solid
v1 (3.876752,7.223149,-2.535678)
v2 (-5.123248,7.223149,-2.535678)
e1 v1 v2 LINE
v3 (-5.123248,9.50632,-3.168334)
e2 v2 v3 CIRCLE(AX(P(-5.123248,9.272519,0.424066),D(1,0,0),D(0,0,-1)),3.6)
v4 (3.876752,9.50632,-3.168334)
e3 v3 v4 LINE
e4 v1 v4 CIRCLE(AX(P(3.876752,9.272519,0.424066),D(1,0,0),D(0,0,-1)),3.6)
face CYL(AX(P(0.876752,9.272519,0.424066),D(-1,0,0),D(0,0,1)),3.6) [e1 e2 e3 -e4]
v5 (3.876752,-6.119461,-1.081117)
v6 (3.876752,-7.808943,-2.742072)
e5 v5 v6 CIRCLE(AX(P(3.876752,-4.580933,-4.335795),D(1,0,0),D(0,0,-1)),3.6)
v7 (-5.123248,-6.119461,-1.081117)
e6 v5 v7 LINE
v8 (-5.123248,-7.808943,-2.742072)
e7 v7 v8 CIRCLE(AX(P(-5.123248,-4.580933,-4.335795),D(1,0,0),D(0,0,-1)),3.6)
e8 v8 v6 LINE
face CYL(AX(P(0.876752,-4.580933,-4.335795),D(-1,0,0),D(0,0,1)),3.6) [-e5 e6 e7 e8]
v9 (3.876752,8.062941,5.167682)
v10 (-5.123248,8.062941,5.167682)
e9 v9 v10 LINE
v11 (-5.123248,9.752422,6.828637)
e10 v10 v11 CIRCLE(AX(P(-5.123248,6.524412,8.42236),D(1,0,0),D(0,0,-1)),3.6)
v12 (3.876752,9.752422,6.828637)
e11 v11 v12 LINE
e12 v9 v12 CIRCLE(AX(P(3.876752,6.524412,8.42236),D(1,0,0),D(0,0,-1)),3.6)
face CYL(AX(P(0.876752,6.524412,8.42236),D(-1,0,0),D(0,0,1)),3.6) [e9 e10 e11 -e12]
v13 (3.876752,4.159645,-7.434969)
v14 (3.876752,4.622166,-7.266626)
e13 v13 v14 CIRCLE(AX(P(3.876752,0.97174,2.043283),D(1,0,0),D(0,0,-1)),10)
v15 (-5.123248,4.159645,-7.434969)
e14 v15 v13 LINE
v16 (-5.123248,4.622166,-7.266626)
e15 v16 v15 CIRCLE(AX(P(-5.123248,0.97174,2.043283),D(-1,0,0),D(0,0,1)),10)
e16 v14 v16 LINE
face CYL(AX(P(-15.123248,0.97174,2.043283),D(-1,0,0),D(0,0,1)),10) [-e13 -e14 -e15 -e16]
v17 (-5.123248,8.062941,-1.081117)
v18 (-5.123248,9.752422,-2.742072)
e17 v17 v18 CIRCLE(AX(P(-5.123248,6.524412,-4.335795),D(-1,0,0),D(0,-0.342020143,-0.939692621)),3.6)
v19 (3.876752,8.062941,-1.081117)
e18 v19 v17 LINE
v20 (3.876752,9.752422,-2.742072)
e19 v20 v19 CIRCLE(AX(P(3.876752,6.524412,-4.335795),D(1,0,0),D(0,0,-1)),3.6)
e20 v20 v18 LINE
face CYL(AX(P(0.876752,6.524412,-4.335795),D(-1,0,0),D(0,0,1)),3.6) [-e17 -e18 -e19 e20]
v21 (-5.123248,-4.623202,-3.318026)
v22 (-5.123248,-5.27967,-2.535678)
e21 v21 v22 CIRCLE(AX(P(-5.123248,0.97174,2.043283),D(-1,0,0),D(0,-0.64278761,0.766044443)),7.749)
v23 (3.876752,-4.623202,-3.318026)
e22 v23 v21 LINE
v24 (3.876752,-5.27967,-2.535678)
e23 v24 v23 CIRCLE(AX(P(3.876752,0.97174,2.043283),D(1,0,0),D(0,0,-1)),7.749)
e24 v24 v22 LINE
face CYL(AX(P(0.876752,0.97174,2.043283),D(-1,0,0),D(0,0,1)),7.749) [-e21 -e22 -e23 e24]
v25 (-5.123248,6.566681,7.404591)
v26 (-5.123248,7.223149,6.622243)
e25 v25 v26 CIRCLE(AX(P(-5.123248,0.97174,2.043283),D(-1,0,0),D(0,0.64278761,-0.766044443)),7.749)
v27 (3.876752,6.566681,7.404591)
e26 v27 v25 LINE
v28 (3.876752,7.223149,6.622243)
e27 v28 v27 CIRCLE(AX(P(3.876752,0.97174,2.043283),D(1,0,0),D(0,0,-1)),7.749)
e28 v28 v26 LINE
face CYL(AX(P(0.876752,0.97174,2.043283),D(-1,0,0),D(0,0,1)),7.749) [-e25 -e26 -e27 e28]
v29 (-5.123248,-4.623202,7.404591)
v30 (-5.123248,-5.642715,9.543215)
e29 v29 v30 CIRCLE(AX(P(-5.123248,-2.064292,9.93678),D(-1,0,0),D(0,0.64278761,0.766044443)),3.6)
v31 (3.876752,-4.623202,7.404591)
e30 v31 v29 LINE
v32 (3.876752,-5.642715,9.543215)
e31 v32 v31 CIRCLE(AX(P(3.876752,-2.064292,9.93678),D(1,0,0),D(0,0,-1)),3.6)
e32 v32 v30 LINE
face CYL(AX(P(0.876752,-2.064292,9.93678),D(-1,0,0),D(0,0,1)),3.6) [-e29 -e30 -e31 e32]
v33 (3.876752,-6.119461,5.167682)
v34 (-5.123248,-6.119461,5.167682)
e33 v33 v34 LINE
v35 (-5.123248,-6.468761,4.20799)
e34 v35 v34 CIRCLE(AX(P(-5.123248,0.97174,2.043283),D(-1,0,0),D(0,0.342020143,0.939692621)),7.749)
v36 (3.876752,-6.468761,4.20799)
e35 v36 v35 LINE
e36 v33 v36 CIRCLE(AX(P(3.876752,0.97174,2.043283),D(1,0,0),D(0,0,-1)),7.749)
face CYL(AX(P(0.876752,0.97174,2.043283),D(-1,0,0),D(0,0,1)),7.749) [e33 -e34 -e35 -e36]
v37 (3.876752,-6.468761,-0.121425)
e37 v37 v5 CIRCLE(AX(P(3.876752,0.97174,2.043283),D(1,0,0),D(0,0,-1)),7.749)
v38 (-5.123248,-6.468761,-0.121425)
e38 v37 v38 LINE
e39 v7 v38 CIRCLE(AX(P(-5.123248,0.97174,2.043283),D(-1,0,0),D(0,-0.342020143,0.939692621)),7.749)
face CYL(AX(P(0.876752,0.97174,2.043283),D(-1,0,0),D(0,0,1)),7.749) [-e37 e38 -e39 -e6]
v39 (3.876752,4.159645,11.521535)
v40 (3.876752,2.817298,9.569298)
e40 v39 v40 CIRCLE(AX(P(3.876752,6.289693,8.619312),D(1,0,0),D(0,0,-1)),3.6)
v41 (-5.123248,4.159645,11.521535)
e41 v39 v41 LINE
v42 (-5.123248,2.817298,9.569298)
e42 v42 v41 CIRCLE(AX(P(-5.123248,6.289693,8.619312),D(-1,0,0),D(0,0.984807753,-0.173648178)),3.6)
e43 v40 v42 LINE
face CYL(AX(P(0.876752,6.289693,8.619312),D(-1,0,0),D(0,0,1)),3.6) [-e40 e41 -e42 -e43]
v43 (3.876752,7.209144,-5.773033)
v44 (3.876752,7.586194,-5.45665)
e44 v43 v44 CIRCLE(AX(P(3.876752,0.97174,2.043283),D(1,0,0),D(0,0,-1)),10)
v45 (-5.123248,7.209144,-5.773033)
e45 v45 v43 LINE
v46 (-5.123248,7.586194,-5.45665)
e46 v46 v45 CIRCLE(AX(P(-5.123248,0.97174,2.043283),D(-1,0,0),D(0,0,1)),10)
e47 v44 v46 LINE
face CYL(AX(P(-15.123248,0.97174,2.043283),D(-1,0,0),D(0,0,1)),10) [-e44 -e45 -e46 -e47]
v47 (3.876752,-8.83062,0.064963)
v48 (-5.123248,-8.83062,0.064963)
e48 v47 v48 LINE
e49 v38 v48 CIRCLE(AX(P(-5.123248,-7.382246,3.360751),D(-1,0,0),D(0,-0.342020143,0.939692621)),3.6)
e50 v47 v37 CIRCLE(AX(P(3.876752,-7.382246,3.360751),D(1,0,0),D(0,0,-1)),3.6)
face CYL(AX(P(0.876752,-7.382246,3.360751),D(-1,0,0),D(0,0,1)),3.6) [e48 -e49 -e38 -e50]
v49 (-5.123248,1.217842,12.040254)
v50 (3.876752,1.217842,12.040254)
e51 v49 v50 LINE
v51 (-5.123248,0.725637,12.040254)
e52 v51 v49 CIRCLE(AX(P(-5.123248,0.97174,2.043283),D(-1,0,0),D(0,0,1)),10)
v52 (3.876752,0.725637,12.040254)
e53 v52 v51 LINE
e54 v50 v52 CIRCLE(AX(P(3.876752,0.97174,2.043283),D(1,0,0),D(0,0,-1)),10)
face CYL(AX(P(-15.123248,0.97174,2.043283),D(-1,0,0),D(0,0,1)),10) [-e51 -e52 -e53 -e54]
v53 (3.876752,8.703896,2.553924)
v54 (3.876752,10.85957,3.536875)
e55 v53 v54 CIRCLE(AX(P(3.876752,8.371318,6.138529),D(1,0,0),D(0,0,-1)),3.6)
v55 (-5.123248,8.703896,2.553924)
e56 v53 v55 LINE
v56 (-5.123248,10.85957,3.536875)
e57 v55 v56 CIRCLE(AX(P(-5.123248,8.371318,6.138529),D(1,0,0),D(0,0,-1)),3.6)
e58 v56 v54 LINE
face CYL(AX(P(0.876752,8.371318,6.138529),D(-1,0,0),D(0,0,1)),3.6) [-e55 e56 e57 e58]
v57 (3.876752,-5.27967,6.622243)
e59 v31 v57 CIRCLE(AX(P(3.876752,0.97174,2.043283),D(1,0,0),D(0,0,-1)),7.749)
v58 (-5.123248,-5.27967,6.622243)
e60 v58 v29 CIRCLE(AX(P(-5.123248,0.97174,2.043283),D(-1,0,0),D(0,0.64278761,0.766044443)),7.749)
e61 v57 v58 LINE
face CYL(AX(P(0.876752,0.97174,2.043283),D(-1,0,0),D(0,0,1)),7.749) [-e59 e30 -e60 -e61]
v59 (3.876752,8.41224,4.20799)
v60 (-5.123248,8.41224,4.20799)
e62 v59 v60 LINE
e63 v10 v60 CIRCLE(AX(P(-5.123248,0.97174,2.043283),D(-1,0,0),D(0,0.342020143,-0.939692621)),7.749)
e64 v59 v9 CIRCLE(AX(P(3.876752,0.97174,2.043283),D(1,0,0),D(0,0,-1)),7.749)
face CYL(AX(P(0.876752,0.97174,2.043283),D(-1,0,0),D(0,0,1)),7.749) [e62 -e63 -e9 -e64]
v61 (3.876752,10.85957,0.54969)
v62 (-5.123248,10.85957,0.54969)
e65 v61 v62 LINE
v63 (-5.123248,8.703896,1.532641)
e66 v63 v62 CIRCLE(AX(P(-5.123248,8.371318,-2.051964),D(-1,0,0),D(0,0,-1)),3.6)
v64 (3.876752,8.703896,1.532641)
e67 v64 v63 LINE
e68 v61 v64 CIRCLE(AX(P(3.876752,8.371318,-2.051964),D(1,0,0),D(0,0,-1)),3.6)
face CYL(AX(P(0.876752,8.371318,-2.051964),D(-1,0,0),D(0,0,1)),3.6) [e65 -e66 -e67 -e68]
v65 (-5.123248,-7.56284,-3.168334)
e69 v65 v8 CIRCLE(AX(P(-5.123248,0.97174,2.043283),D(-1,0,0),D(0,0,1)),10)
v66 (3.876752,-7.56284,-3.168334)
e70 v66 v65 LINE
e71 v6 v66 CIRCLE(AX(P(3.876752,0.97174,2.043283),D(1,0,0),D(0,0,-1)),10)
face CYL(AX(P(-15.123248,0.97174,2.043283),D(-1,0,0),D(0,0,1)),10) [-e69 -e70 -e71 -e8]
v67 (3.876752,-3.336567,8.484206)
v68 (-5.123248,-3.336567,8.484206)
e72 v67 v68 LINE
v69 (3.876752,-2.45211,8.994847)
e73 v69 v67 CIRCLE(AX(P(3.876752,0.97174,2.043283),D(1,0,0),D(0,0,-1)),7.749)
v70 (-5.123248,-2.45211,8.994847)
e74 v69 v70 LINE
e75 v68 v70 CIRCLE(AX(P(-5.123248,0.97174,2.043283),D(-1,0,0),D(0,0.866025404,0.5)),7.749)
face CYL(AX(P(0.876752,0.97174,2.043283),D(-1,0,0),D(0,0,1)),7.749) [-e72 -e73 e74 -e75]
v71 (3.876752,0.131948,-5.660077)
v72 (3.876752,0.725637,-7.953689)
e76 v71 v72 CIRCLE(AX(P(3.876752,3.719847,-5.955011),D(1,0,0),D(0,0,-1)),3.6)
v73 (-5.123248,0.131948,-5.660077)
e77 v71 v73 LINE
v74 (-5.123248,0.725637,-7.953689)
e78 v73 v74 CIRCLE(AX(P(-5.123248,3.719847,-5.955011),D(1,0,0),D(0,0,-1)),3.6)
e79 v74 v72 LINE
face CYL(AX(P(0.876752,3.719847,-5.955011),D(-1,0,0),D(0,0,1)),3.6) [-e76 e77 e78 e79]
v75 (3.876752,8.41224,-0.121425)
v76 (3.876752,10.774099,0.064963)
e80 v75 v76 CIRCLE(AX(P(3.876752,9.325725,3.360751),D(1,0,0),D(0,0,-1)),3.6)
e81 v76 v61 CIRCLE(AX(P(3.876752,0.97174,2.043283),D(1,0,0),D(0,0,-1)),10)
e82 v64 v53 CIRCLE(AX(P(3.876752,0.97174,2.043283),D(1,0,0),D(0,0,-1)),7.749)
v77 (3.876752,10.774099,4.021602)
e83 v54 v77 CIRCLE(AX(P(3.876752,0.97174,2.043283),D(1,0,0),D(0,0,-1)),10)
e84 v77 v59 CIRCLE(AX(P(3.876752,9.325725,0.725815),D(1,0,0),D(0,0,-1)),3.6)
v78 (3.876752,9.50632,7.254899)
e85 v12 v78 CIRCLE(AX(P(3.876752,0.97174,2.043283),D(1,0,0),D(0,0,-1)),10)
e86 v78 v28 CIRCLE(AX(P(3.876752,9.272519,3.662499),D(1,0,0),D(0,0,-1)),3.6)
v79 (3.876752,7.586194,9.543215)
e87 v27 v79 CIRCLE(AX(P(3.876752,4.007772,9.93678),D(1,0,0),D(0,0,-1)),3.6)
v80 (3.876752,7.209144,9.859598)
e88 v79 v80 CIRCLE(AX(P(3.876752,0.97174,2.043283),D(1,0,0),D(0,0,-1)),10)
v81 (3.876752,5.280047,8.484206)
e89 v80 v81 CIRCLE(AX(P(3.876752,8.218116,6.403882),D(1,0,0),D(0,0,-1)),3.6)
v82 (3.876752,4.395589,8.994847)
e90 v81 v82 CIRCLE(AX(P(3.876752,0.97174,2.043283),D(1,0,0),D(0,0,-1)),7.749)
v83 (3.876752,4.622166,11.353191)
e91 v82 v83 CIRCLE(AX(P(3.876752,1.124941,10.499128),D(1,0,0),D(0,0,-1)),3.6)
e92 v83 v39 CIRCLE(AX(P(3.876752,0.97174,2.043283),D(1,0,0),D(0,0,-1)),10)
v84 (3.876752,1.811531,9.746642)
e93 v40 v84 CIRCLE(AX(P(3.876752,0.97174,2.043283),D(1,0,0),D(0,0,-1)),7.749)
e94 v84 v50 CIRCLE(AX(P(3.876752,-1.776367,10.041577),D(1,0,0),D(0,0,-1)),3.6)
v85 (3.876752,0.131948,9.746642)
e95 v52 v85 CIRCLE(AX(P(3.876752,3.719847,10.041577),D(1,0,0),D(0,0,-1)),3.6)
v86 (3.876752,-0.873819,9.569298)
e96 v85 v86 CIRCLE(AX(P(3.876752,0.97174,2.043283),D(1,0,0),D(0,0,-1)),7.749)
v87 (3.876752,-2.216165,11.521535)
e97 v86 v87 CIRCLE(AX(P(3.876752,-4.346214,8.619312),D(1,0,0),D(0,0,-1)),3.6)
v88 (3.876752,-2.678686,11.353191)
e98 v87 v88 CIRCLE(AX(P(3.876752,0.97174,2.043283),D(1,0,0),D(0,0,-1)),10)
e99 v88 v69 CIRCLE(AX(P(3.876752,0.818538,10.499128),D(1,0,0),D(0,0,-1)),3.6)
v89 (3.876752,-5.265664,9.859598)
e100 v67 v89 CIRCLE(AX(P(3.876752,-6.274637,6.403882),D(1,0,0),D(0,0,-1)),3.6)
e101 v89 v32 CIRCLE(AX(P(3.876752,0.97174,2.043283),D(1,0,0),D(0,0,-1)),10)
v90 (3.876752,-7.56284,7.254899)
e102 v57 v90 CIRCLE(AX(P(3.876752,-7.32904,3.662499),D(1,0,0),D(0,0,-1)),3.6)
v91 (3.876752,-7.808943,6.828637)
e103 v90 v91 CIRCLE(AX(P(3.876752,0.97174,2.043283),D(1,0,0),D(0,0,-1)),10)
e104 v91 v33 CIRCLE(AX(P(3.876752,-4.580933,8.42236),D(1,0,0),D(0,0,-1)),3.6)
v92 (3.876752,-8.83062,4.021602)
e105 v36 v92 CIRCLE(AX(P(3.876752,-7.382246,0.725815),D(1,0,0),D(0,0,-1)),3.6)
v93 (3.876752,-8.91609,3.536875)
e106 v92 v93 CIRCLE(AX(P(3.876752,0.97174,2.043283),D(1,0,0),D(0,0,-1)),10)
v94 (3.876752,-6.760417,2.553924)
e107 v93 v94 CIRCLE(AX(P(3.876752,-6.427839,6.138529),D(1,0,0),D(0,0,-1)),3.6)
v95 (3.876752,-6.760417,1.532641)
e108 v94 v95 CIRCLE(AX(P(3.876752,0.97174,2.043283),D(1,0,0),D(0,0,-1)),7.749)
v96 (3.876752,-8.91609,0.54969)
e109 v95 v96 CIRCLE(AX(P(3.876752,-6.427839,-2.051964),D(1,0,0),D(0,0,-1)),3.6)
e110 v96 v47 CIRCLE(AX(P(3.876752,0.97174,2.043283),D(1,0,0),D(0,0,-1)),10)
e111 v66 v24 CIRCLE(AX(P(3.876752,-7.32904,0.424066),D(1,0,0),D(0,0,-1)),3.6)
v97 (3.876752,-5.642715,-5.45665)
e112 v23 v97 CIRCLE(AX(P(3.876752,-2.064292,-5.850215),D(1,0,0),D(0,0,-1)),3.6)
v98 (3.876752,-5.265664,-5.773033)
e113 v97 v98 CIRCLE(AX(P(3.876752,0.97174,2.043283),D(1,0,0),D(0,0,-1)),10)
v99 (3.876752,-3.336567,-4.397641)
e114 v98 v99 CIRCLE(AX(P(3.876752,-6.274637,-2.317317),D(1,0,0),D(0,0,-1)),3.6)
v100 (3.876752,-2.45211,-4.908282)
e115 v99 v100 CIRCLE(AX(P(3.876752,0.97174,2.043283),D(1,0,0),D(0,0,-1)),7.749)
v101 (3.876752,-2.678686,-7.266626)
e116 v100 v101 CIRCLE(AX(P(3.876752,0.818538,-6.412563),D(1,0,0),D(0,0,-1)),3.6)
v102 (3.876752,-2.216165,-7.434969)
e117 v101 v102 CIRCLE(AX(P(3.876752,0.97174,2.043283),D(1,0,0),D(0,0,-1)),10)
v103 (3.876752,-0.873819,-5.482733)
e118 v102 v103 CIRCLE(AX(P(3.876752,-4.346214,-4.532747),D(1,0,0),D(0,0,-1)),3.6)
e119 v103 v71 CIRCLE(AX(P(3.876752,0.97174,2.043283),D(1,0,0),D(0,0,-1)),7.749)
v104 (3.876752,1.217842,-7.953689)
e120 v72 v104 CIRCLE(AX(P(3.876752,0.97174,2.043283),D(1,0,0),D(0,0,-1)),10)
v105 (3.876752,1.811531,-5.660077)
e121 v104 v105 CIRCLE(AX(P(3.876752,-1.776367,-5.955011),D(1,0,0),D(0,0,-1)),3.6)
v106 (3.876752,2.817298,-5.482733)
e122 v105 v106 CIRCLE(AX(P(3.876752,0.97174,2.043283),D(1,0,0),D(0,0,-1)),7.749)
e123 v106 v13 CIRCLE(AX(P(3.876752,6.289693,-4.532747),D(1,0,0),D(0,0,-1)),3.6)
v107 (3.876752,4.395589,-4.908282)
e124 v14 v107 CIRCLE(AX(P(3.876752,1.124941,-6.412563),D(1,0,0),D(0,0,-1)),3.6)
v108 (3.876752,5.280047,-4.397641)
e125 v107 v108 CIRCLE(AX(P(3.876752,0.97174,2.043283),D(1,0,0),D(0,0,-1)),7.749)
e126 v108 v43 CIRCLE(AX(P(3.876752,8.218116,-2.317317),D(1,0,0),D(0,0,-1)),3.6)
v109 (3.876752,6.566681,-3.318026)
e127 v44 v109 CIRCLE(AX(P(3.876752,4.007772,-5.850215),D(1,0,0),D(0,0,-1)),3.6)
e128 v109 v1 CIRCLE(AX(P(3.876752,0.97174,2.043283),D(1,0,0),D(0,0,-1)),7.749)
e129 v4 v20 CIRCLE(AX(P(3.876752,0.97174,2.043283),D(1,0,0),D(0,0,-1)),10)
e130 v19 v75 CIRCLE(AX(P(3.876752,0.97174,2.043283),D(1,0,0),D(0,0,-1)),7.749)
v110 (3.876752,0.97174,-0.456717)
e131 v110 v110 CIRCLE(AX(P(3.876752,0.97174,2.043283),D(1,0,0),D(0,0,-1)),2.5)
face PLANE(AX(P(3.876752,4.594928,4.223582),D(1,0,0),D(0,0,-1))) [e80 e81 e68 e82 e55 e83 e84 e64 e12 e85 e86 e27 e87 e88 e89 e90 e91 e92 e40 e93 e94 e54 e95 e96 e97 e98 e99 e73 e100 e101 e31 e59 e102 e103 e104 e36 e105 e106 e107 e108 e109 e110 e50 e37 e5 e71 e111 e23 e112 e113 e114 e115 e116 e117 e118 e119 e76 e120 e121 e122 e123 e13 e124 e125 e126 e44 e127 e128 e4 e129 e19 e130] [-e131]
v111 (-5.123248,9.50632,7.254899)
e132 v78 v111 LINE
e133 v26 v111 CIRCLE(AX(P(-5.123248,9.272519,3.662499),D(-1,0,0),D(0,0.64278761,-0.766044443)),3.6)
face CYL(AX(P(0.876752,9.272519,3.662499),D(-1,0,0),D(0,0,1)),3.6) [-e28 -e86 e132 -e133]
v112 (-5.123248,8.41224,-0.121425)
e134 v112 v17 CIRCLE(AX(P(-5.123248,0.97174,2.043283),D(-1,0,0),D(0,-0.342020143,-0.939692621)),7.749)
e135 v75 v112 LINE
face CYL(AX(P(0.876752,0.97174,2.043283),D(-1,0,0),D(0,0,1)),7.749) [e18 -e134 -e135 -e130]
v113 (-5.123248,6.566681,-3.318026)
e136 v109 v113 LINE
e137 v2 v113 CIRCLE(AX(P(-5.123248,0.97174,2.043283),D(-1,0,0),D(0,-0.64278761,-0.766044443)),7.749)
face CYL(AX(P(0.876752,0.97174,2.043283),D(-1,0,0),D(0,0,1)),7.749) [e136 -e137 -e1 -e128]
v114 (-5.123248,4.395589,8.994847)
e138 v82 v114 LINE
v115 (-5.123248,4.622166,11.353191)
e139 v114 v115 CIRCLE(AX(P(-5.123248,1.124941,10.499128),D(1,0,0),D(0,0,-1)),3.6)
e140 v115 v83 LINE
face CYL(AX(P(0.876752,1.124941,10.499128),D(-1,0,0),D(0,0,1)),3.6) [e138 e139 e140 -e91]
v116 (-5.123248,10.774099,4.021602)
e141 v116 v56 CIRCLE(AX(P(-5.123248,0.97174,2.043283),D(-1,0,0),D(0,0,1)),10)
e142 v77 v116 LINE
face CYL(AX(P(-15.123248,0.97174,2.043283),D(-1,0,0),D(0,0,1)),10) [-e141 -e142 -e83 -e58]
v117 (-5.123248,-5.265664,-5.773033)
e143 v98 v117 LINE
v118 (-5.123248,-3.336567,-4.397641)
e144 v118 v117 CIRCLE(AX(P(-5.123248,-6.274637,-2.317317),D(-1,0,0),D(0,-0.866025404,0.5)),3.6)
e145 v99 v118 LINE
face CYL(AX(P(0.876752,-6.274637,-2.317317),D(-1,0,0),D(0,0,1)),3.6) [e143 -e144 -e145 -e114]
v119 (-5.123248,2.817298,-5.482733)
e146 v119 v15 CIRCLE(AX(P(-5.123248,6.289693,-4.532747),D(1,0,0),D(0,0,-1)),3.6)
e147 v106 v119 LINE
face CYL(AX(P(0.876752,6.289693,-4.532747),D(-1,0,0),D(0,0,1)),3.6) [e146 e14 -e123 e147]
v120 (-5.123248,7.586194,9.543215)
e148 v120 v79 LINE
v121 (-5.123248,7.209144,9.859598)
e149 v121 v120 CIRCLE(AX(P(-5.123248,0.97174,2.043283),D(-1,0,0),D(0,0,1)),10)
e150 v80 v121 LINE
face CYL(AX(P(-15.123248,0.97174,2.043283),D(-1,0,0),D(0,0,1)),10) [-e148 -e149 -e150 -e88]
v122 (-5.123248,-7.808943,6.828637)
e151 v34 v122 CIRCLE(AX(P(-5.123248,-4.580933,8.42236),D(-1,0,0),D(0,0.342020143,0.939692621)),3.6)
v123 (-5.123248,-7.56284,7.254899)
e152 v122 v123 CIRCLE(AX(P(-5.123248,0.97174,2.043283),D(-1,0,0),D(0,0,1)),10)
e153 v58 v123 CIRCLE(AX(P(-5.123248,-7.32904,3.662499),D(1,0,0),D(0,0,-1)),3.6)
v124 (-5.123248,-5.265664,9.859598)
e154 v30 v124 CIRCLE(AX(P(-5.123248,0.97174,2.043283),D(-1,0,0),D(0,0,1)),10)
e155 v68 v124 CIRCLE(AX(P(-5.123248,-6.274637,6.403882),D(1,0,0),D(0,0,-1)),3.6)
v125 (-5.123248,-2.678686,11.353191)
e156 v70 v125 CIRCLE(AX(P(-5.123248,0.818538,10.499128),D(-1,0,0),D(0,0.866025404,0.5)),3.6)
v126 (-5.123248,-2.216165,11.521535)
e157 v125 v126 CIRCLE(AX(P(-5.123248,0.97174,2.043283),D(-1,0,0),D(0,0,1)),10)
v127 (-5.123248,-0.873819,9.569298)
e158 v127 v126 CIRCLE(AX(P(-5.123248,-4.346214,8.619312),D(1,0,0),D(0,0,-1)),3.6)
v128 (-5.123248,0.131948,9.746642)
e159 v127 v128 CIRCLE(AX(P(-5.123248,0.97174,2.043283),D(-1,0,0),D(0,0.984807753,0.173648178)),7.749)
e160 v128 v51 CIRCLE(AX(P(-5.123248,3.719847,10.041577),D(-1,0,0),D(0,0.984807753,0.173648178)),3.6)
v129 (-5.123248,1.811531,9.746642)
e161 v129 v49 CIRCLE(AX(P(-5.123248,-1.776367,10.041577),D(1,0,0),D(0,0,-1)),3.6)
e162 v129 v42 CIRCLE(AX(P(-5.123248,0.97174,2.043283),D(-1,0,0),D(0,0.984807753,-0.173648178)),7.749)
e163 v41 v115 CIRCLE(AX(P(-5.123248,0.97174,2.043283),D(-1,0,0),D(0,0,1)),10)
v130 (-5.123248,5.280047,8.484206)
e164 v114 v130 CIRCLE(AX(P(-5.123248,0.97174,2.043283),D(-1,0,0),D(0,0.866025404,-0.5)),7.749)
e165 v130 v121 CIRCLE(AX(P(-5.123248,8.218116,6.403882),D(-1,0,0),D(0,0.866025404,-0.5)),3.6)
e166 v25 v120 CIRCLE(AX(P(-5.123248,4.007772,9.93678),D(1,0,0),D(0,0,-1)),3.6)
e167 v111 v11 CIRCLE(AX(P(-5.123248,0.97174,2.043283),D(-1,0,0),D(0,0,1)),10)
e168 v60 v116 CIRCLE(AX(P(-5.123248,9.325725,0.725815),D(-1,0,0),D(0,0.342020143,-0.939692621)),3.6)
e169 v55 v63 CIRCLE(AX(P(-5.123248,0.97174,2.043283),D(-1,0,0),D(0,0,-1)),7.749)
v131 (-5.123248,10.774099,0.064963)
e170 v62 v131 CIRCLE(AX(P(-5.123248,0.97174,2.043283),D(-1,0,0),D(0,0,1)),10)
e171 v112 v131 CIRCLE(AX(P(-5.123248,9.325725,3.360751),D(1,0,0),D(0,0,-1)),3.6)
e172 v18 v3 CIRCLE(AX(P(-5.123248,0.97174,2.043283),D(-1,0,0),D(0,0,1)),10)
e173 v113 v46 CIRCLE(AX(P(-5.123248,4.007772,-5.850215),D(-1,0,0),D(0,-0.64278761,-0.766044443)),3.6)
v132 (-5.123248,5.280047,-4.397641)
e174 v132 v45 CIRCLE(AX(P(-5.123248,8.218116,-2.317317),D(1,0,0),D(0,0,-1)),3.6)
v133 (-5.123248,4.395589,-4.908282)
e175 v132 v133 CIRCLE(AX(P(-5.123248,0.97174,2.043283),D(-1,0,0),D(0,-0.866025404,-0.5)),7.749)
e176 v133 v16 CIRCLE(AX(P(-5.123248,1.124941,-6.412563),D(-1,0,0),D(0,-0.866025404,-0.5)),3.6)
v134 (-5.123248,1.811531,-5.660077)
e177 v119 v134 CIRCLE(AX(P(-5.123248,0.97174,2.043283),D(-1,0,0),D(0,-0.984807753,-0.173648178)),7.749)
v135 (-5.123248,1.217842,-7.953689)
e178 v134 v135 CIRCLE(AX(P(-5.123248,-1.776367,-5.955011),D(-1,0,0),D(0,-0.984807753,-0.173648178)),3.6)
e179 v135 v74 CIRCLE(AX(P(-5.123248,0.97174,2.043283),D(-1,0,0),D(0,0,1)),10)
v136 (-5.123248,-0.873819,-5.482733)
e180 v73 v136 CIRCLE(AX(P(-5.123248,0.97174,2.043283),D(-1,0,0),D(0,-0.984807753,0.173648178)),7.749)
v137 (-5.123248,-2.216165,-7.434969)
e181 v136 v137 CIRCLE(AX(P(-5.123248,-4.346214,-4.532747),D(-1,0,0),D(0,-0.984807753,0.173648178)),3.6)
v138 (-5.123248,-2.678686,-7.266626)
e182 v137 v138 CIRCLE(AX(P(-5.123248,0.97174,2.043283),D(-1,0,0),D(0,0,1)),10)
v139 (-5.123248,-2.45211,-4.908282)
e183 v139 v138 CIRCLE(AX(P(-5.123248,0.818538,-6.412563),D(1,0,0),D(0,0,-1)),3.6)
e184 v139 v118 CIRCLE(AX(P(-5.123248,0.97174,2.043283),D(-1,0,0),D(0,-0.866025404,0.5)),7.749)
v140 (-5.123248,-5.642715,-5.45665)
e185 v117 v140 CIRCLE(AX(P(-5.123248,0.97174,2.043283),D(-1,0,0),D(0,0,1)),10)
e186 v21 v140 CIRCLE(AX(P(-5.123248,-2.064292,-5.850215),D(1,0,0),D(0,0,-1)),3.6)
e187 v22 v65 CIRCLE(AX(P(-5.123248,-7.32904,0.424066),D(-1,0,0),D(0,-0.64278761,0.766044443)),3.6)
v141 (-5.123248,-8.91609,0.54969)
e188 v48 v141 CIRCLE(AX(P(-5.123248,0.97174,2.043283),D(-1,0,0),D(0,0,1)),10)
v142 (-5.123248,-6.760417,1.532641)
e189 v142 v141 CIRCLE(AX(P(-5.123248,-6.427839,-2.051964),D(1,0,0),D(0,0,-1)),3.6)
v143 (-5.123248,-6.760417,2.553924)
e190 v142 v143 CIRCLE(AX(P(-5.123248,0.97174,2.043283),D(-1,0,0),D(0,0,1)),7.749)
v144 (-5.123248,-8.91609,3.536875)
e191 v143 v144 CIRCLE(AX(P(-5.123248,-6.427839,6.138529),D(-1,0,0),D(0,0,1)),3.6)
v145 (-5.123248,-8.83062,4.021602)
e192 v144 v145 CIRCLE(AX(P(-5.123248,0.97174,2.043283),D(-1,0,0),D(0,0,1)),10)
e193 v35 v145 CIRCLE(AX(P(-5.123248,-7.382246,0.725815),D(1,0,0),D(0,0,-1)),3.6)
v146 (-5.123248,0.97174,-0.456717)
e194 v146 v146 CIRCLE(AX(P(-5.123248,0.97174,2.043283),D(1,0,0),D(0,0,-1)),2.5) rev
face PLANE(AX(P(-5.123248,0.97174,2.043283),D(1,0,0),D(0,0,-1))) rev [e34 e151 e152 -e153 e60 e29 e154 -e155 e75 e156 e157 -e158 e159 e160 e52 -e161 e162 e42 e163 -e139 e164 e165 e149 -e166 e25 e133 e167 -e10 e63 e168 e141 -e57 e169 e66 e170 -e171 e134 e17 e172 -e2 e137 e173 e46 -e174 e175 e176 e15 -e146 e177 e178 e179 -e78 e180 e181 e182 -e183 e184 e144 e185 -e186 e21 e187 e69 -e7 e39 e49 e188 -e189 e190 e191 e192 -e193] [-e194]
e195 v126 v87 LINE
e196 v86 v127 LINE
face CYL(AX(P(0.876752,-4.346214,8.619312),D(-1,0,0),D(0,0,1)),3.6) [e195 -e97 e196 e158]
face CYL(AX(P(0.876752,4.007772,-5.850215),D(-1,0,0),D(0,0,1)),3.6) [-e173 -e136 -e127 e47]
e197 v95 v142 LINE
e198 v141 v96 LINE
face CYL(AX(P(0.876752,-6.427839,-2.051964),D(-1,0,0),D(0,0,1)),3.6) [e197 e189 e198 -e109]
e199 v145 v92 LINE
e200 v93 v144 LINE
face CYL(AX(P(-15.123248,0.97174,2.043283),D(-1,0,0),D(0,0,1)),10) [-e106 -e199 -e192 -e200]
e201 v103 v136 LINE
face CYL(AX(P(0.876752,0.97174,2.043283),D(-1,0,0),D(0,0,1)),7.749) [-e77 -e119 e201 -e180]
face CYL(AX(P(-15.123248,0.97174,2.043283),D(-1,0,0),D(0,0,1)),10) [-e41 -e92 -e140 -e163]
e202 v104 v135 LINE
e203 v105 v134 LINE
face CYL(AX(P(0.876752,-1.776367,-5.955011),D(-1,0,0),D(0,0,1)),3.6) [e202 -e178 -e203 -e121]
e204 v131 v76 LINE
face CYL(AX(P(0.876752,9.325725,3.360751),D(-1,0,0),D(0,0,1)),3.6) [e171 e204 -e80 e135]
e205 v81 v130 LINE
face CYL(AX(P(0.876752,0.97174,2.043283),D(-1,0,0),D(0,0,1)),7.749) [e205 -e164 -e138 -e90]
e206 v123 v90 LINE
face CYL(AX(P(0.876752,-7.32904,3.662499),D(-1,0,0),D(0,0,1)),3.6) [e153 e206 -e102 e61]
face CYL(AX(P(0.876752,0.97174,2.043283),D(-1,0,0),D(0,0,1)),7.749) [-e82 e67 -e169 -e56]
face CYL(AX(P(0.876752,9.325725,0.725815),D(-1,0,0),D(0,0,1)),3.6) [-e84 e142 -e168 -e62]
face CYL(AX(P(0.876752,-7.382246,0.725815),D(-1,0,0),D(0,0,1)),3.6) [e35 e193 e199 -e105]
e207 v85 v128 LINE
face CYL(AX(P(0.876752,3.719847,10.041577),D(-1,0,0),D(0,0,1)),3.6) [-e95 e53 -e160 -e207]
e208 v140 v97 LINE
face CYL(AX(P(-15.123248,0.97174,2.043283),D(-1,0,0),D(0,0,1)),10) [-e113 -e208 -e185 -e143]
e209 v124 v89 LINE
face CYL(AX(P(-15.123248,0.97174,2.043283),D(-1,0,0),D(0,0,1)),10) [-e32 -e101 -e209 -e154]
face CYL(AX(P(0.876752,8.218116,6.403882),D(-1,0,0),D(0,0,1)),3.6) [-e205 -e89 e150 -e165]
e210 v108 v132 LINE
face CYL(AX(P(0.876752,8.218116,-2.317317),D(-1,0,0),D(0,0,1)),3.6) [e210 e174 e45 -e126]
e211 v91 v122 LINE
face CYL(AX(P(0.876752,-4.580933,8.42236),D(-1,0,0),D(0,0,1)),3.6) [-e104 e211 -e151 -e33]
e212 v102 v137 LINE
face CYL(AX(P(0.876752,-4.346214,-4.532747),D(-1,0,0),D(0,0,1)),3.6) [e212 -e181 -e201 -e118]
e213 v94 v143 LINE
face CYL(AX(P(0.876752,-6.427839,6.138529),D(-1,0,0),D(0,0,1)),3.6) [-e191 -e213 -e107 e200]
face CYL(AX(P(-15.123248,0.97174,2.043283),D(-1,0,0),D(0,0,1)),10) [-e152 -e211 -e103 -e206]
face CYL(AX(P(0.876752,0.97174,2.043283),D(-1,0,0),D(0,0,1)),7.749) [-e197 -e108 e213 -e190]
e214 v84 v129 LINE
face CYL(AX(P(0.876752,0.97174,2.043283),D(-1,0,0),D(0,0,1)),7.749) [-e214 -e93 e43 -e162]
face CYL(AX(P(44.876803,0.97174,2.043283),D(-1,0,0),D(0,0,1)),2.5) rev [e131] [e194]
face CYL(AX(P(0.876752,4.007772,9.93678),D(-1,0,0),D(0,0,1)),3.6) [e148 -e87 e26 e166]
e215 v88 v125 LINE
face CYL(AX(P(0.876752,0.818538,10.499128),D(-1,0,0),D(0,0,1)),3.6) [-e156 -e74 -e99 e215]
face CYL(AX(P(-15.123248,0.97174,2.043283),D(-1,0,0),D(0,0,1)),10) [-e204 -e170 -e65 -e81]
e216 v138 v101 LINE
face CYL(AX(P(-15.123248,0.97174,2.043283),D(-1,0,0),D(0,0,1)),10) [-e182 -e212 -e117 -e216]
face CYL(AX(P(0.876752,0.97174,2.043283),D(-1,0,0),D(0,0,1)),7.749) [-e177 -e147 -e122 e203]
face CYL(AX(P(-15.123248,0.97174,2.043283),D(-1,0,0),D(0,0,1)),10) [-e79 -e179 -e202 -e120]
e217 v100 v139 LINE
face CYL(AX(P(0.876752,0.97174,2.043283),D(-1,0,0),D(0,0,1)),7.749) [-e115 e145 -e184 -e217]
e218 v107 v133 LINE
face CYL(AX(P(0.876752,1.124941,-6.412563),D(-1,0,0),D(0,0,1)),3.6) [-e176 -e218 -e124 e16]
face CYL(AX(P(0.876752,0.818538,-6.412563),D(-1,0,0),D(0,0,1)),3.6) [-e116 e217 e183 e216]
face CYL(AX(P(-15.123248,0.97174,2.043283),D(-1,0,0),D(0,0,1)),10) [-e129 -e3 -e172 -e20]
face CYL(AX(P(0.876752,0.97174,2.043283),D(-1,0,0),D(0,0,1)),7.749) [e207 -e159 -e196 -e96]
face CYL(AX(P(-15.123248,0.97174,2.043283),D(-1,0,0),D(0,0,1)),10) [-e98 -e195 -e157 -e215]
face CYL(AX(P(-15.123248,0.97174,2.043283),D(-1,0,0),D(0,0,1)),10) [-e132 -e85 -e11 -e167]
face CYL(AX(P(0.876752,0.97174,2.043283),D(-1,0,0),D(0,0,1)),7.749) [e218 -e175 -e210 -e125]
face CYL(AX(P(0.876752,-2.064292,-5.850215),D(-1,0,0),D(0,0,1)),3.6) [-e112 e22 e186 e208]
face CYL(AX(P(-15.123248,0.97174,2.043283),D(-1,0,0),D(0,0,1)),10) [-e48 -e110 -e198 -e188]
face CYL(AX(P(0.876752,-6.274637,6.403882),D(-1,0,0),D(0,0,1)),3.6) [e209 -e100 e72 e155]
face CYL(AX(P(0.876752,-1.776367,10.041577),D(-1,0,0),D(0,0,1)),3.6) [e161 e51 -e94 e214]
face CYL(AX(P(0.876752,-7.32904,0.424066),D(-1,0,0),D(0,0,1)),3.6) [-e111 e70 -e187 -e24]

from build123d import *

# Parameters (mm, degrees)
SPUR_START             = -5.123248026
SPUR_GEAR_AM_OUTLINE_R = 2.5
SPUR_GEAR_AM_DEPTH     = 6
SKETCH9_R              = 2.5
BOSS_EXTRUDE1_DEPTH    = 3


# Read off the part's stored shape, not the designer's step: spur gear_am
with BuildPart() as part:
    # spur gear_am outline → spur gear_am (new body)
    with BuildSketch(Plane.YZ.offset(SPUR_START)):
        with BuildLine():
            ThreePointArc((7.586194163, 9.54321535), (7.39961576, 9.703727004), (7.209143639, 9.859598305))
            ThreePointArc((7.209143639, 9.859598305), (6.128209094, 9.33514268), (5.280046523, 8.484205876))
            ThreePointArc((5.280046523, 8.484205876), (4.846239663, 8.754113426), (4.395589438, 8.994847412))
            ThreePointArc((4.395589438, 8.994847412), (4.708441041, 10.154846148), (4.622165664, 11.353190736))
            ThreePointArc((4.622165664, 11.353190736), (4.391941096, 11.44020878), (4.159644725, 11.52153459))
            ThreePointArc((4.159644725, 11.52153459), (3.323272898, 10.659006121), (2.817298316, 9.569298401))
            ThreePointArc((2.817298316, 9.569298401), (2.317339392, 9.67455785), (1.811530828, 9.746642346))
            ThreePointArc((1.811530828, 9.746642346), (1.708772237, 10.943686148), (1.217841914, 12.040253798))
            ThreePointArc((1.217841914, 12.040253798), (0.971739663, 12.043282572), (0.725637412, 12.040253798))
            ThreePointArc((0.725637412, 12.040253798), (0.234707088, 10.943686148), (0.131948498, 9.746642346))
            ThreePointArc((0.131948498, 9.746642346), (-0.373860066, 9.67455785), (-0.87381899, 9.569298401))
            ThreePointArc((-0.87381899, 9.569298401), (-1.379793572, 10.659006121), (-2.216165399, 11.52153459))
            ThreePointArc((-2.216165399, 11.52153459), (-2.44846177, 11.44020878), (-2.678686338, 11.353190736))
            ThreePointArc((-2.678686338, 11.353190736), (-2.764961716, 10.154846148), (-2.452110112, 8.994847412))
            ThreePointArc((-2.452110112, 8.994847412), (-2.902760337, 8.754113426), (-3.336567197, 8.484205876))
            ThreePointArc((-3.336567197, 8.484205876), (-4.184729769, 9.33514268), (-5.265664313, 9.859598305))
            ThreePointArc((-5.265664313, 9.859598305), (-5.456136434, 9.703727004), (-5.642714837, 9.54321535))
            ThreePointArc((-5.642714837, 9.54321535), (-5.313929185, 8.387631866), (-4.623201908, 7.404591164))
            ThreePointArc((-4.623201908, 7.404591164), (-4.964338727, 7.02424376), (-5.279670013, 6.622242942))
            ThreePointArc((-5.279670013, 6.622242942), (-6.367719651, 7.131773293), (-7.562840254, 7.254898987))
            ThreePointArc((-7.562840254, 7.254898987), (-7.688514375, 7.043282572), (-7.808942505, 6.828637384))
            ThreePointArc((-7.808942505, 6.828637384), (-7.104752225, 5.855195427), (-6.119461178, 5.167681976))
            ThreePointArc((-6.119461178, 5.167681976), (-6.309938456, 4.693596663), (-6.468760561, 4.207989809))
            ThreePointArc((-6.468760561, 4.207989809), (-7.66546242, 4.314656828), (-8.830619899, 4.021601813))
            ThreePointArc((-8.830619899, 4.021601813), (-8.876337867, 3.779764349), (-8.916090314, 3.536875003))
            ThreePointArc((-8.916090314, 3.536875003), (-7.921431147, 2.86298604), (-6.760416972, 2.553924109))
            ThreePointArc((-6.760416972, 2.553924109), (-6.777260337, 2.043282572), (-6.760416972, 1.532641036))
            ThreePointArc((-6.760416972, 1.532641036), (-7.921431147, 1.223579105), (-8.916090314, 0.549690142))
            ThreePointArc((-8.916090314, 0.549690142), (-8.876337867, 0.306800796), (-8.830619899, 0.064963332))
            ThreePointArc((-8.830619899, 0.064963332), (-7.66546242, -0.228091683), (-6.468760561, -0.121424665))
            ThreePointArc((-6.468760561, -0.121424665), (-6.309938456, -0.607031518), (-6.119461178, -1.081116831))
            ThreePointArc((-6.119461178, -1.081116831), (-7.104752225, -1.768630282), (-7.808942505, -2.742072239))
            ThreePointArc((-7.808942505, -2.742072239), (-7.688514375, -2.956717428), (-7.562840254, -3.168333842))
            ThreePointArc((-7.562840254, -3.168333842), (-6.36771965, -3.045208149), (-5.279670013, -2.535677797))
            ThreePointArc((-5.279670013, -2.535677797), (-4.964338727, -2.937678615), (-4.623201908, -3.31802602))
            ThreePointArc((-4.623201908, -3.31802602), (-5.313929185, -4.301066721), (-5.642714837, -5.456650205))
            ThreePointArc((-5.642714837, -5.456650205), (-5.456136434, -5.617161859), (-5.265664313, -5.773033161))
            ThreePointArc((-5.265664313, -5.773033161), (-4.184729769, -5.248577535), (-3.336567197, -4.397640731))
            ThreePointArc((-3.336567197, -4.397640731), (-2.902760337, -4.667548282), (-2.452110112, -4.908282267))
            ThreePointArc((-2.452110112, -4.908282267), (-2.764961716, -6.068281003), (-2.678686338, -7.266625591))
            ThreePointArc((-2.678686338, -7.266625591), (-2.44846177, -7.353643635), (-2.216165399, -7.434969446))
            ThreePointArc((-2.216165399, -7.434969446), (-1.379793572, -6.572440977), (-0.87381899, -5.482733257))
            ThreePointArc((-0.87381899, -5.482733257), (-0.373860066, -5.587992706), (0.131948498, -5.660077201))
            ThreePointArc((0.131948498, -5.660077201), (0.234707088, -6.857121003), (0.725637412, -7.953688653))
            ThreePointArc((0.725637412, -7.953688653), (0.971739663, -7.956717428), (1.217841914, -7.953688653))
            ThreePointArc((1.217841914, -7.953688653), (1.708772237, -6.857121003), (1.811530828, -5.660077201))
            ThreePointArc((1.811530828, -5.660077201), (2.317339392, -5.587992706), (2.817298316, -5.482733257))
            ThreePointArc((2.817298316, -5.482733257), (3.323272898, -6.572440977), (4.159644725, -7.434969446))
            ThreePointArc((4.159644725, -7.434969446), (4.391941096, -7.353643635), (4.622165664, -7.266625591))
            ThreePointArc((4.622165664, -7.266625591), (4.708441041, -6.068281003), (4.395589438, -4.908282267))
            ThreePointArc((4.395589438, -4.908282267), (4.846239663, -4.667548282), (5.280046523, -4.397640731))
            ThreePointArc((5.280046523, -4.397640731), (6.128209095, -5.248577535), (7.209143639, -5.773033161))
            ThreePointArc((7.209143639, -5.773033161), (7.39961576, -5.617161859), (7.586194163, -5.456650205))
            ThreePointArc((7.586194163, -5.456650205), (7.257408511, -4.301066721), (6.566681234, -3.31802602))
            ThreePointArc((6.566681234, -3.31802602), (6.907818053, -2.937678615), (7.223149338, -2.535677797))
            ThreePointArc((7.223149338, -2.535677797), (8.311198976, -3.045208149), (9.506319579, -3.168333842))
            ThreePointArc((9.506319579, -3.168333842), (9.631993701, -2.956717428), (9.752421831, -2.742072239))
            ThreePointArc((9.752421831, -2.742072239), (9.048231551, -1.768630282), (8.062940504, -1.081116831))
            ThreePointArc((8.062940504, -1.081116831), (8.253417781, -0.607031518), (8.412239886, -0.121424665))
            ThreePointArc((8.412239886, -0.121424665), (9.608941746, -0.228091683), (10.774099225, 0.064963332))
            ThreePointArc((10.774099225, 0.064963332), (10.819817193, 0.306800796), (10.85956964, 0.549690142))
            ThreePointArc((10.85956964, 0.549690142), (9.864910473, 1.223579105), (8.703896297, 1.532641036))
            ThreePointArc((8.703896297, 1.532641036), (8.720739663, 2.043282572), (8.703896297, 2.553924109))
            ThreePointArc((8.703896297, 2.553924109), (9.864910473, 2.86298604), (10.85956964, 3.536875003))
            ThreePointArc((10.85956964, 3.536875003), (10.819817193, 3.779764349), (10.774099225, 4.021601813))
            ThreePointArc((10.774099225, 4.021601813), (9.608941746, 4.314656828), (8.412239886, 4.207989809))
            ThreePointArc((8.412239886, 4.207989809), (8.253417781, 4.693596663), (8.062940504, 5.167681976))
            ThreePointArc((8.062940504, 5.167681976), (9.048231551, 5.855195427), (9.752421831, 6.828637384))
            ThreePointArc((9.752421831, 6.828637384), (9.631993701, 7.043282573), (9.506319579, 7.254898987))
            ThreePointArc((9.506319579, 7.254898987), (8.311198976, 7.131773293), (7.223149338, 6.622242942))
            ThreePointArc((7.223149338, 6.622242942), (6.907818053, 7.02424376), (6.566681234, 7.404591164))
            ThreePointArc((6.566681234, 7.404591164), (7.257408511, 8.387631866), (7.586194163, 9.54321535))
        make_face()
        with Locations((0.971739663, 2.043282572)):
            Circle(SPUR_GEAR_AM_OUTLINE_R, mode=Mode.SUBTRACT)
    extrude(amount=SPUR_GEAR_AM_DEPTH)

    # Sketch9 → Boss-Extrude1 (add)
    with BuildSketch(Plane(origin=(0.876751974, 0.971739663, 2.043282572), x_dir=(0, 0, -1), z_dir=(1, 0, 0))):
        with BuildLine():
            ThreePointArc((-7.816315733, 6.237403976), (-7.291860108, 5.156469432), (-6.440923303, 4.30830686))
            ThreePointArc((-6.440923303, 4.30830686), (-6.710830854, 3.8745), (-6.95156484, 3.423849775))
            ThreePointArc((-6.95156484, 3.423849775), (-8.111563575, 3.736701378), (-9.309908163, 3.650426001))
            ThreePointArc((-9.309908163, 3.650426001), (-9.396926208, 3.420201433), (-9.478252018, 3.187905062))
            ThreePointArc((-9.478252018, 3.187905062), (-8.615723549, 2.351533235), (-7.526015829, 1.845558653))
            ThreePointArc((-7.526015829, 1.845558653), (-7.631275278, 1.345599729), (-7.703359773, 0.839791165))
            ThreePointArc((-7.703359773, 0.839791165), (-8.900403576, 0.737032575), (-9.996971225, 0.246102251))
            ThreePointArc((-9.996971225, 0.246102251), (-10, 0), (-9.996971225, -0.246102251))
            ThreePointArc((-9.996971225, -0.246102251), (-8.900403576, -0.737032575), (-7.703359773, -0.839791165))
            ThreePointArc((-7.703359773, -0.839791165), (-7.631275278, -1.345599729), (-7.526015829, -1.845558653))
            ThreePointArc((-7.526015829, -1.845558653), (-8.615723549, -2.351533235), (-9.478252018, -3.187905062))
            ThreePointArc((-9.478252018, -3.187905062), (-9.396926208, -3.420201433), (-9.309908163, -3.650426001))
            ThreePointArc((-9.309908163, -3.650426001), (-8.111563575, -3.736701378), (-6.95156484, -3.423849775))
            ThreePointArc((-6.95156484, -3.423849775), (-6.710830854, -3.8745), (-6.440923303, -4.30830686))
            ThreePointArc((-6.440923303, -4.30830686), (-7.291860108, -5.156469432), (-7.816315733, -6.237403976))
            ThreePointArc((-7.816315733, -6.237403976), (-7.660444431, -6.427876097), (-7.499932777, -6.6144545))
            ThreePointArc((-7.499932777, -6.6144545), (-6.344349294, -6.285668848), (-5.361308592, -5.594941571))
            ThreePointArc((-5.361308592, -5.594941571), (-4.980961187, -5.93607839), (-4.57896037, -6.251409676))
            ThreePointArc((-4.57896037, -6.251409676), (-5.088490721, -7.339459313), (-5.211616414, -8.534579916))
            ThreePointArc((-5.211616414, -8.534579916), (-5, -8.660254038), (-4.785354811, -8.780682168))
            ThreePointArc((-4.785354811, -8.780682168), (-3.811912855, -8.076491888), (-3.124399404, -7.091200841))
            ThreePointArc((-3.124399404, -7.091200841), (-2.650314091, -7.281678118), (-2.164707237, -7.440500224))
            ThreePointArc((-2.164707237, -7.440500224), (-2.271374255, -8.637202083), (-1.978319241, -9.802359562))
            ThreePointArc((-1.978319241, -9.802359562), (-1.736481777, -9.84807753), (-1.49359243, -9.887829977))
            ThreePointArc((-1.49359243, -9.887829977), (-0.819703468, -8.89317081), (-0.510641536, -7.732156635))
            ThreePointArc((-0.510641536, -7.732156635), (0, -7.749), (0.510641536, -7.732156635))
            ThreePointArc((0.510641536, -7.732156635), (0.819703468, -8.89317081), (1.49359243, -9.887829977))
            ThreePointArc((1.49359243, -9.887829977), (1.736481777, -9.84807753), (1.978319241, -9.802359562))
            ThreePointArc((1.978319241, -9.802359562), (2.271374255, -8.637202083), (2.164707237, -7.440500224))
            ThreePointArc((2.164707237, -7.440500224), (2.650314091, -7.281678118), (3.124399404, -7.091200841))
            ThreePointArc((3.124399404, -7.091200841), (3.811912855, -8.076491888), (4.785354811, -8.780682168))
            ThreePointArc((4.785354811, -8.780682168), (5, -8.660254038), (5.211616414, -8.534579916))
            ThreePointArc((5.211616414, -8.534579916), (5.088490721, -7.339459313), (4.57896037, -6.251409676))
            ThreePointArc((4.57896037, -6.251409676), (4.980961187, -5.93607839), (5.361308592, -5.594941571))
            ThreePointArc((5.361308592, -5.594941571), (6.344349294, -6.285668848), (7.499932777, -6.6144545))
            ThreePointArc((7.499932777, -6.6144545), (7.660444431, -6.427876097), (7.816315733, -6.237403976))
            ThreePointArc((7.816315733, -6.237403976), (7.291860108, -5.156469432), (6.440923303, -4.30830686))
            ThreePointArc((6.440923303, -4.30830686), (6.710830854, -3.8745), (6.95156484, -3.423849775))
            ThreePointArc((6.95156484, -3.423849775), (8.111563575, -3.736701378), (9.309908163, -3.650426001))
            ThreePointArc((9.309908163, -3.650426001), (9.396926208, -3.420201433), (9.478252018, -3.187905062))
            ThreePointArc((9.478252018, -3.187905062), (8.615723549, -2.351533235), (7.526015829, -1.845558653))
            ThreePointArc((7.526015829, -1.845558653), (7.631275278, -1.345599729), (7.703359773, -0.839791165))
            ThreePointArc((7.703359773, -0.839791165), (8.900403576, -0.737032575), (9.996971225, -0.246102251))
            ThreePointArc((9.996971225, -0.246102251), (10, 0), (9.996971225, 0.246102251))
            ThreePointArc((9.996971225, 0.246102251), (8.900403576, 0.737032575), (7.703359773, 0.839791165))
            ThreePointArc((7.703359773, 0.839791165), (7.631275278, 1.345599729), (7.526015829, 1.845558653))
            ThreePointArc((7.526015829, 1.845558653), (8.615723549, 2.351533235), (9.478252018, 3.187905062))
            ThreePointArc((9.478252018, 3.187905062), (9.396926208, 3.420201433), (9.309908163, 3.650426001))
            ThreePointArc((9.309908163, 3.650426001), (8.111563575, 3.736701378), (6.95156484, 3.423849775))
            ThreePointArc((6.95156484, 3.423849775), (6.710830854, 3.8745), (6.440923303, 4.30830686))
            ThreePointArc((6.440923303, 4.30830686), (7.291860108, 5.156469432), (7.816315733, 6.237403976))
            ThreePointArc((7.816315733, 6.237403976), (7.660444431, 6.427876097), (7.499932777, 6.6144545))
            ThreePointArc((7.499932777, 6.6144545), (6.344349294, 6.285668848), (5.361308592, 5.594941571))
            ThreePointArc((5.361308592, 5.594941571), (4.980961187, 5.93607839), (4.57896037, 6.251409676))
            ThreePointArc((4.57896037, 6.251409676), (5.088490721, 7.339459313), (5.211616414, 8.534579916))
            ThreePointArc((5.211616414, 8.534579916), (5, 8.660254038), (4.785354811, 8.780682168))
            ThreePointArc((4.785354811, 8.780682168), (3.811912855, 8.076491888), (3.124399404, 7.091200841))
            ThreePointArc((3.124399404, 7.091200841), (2.650314091, 7.281678118), (2.164707237, 7.440500224))
            ThreePointArc((2.164707237, 7.440500224), (2.271374255, 8.637202083), (1.978319241, 9.802359562))
            ThreePointArc((1.978319241, 9.802359562), (1.736481777, 9.84807753), (1.49359243, 9.887829977))
            ThreePointArc((1.49359243, 9.887829977), (0.819703468, 8.89317081), (0.510641536, 7.732156635))
            ThreePointArc((0.510641536, 7.732156635), (0, 7.749), (-0.510641536, 7.732156635))
            ThreePointArc((-0.510641536, 7.732156635), (-0.819703468, 8.89317081), (-1.49359243, 9.887829977))
            ThreePointArc((-1.49359243, 9.887829977), (-1.736481777, 9.84807753), (-1.978319241, 9.802359562))
            ThreePointArc((-1.978319241, 9.802359562), (-2.271374255, 8.637202083), (-2.164707237, 7.440500224))
            ThreePointArc((-2.164707237, 7.440500224), (-2.650314091, 7.281678118), (-3.124399404, 7.091200841))
            ThreePointArc((-3.124399404, 7.091200841), (-3.811912855, 8.076491888), (-4.785354811, 8.780682168))
            ThreePointArc((-4.785354811, 8.780682168), (-5, 8.660254038), (-5.211616414, 8.534579916))
            ThreePointArc((-5.211616414, 8.534579916), (-5.088490721, 7.339459313), (-4.57896037, 6.251409676))
            ThreePointArc((-4.57896037, 6.251409676), (-4.980961187, 5.93607839), (-5.361308592, 5.594941571))
            ThreePointArc((-5.361308592, 5.594941571), (-6.344349294, 6.285668848), (-7.499932777, 6.6144545))
            ThreePointArc((-7.499932777, 6.6144545), (-7.660444431, 6.427876097), (-7.816315733, 6.237403976))
        make_face()
        Circle(SKETCH9_R, mode=Mode.SUBTRACT)
    extrude(amount=BOSS_EXTRUDE1_DEPTH)


solid = part.part
